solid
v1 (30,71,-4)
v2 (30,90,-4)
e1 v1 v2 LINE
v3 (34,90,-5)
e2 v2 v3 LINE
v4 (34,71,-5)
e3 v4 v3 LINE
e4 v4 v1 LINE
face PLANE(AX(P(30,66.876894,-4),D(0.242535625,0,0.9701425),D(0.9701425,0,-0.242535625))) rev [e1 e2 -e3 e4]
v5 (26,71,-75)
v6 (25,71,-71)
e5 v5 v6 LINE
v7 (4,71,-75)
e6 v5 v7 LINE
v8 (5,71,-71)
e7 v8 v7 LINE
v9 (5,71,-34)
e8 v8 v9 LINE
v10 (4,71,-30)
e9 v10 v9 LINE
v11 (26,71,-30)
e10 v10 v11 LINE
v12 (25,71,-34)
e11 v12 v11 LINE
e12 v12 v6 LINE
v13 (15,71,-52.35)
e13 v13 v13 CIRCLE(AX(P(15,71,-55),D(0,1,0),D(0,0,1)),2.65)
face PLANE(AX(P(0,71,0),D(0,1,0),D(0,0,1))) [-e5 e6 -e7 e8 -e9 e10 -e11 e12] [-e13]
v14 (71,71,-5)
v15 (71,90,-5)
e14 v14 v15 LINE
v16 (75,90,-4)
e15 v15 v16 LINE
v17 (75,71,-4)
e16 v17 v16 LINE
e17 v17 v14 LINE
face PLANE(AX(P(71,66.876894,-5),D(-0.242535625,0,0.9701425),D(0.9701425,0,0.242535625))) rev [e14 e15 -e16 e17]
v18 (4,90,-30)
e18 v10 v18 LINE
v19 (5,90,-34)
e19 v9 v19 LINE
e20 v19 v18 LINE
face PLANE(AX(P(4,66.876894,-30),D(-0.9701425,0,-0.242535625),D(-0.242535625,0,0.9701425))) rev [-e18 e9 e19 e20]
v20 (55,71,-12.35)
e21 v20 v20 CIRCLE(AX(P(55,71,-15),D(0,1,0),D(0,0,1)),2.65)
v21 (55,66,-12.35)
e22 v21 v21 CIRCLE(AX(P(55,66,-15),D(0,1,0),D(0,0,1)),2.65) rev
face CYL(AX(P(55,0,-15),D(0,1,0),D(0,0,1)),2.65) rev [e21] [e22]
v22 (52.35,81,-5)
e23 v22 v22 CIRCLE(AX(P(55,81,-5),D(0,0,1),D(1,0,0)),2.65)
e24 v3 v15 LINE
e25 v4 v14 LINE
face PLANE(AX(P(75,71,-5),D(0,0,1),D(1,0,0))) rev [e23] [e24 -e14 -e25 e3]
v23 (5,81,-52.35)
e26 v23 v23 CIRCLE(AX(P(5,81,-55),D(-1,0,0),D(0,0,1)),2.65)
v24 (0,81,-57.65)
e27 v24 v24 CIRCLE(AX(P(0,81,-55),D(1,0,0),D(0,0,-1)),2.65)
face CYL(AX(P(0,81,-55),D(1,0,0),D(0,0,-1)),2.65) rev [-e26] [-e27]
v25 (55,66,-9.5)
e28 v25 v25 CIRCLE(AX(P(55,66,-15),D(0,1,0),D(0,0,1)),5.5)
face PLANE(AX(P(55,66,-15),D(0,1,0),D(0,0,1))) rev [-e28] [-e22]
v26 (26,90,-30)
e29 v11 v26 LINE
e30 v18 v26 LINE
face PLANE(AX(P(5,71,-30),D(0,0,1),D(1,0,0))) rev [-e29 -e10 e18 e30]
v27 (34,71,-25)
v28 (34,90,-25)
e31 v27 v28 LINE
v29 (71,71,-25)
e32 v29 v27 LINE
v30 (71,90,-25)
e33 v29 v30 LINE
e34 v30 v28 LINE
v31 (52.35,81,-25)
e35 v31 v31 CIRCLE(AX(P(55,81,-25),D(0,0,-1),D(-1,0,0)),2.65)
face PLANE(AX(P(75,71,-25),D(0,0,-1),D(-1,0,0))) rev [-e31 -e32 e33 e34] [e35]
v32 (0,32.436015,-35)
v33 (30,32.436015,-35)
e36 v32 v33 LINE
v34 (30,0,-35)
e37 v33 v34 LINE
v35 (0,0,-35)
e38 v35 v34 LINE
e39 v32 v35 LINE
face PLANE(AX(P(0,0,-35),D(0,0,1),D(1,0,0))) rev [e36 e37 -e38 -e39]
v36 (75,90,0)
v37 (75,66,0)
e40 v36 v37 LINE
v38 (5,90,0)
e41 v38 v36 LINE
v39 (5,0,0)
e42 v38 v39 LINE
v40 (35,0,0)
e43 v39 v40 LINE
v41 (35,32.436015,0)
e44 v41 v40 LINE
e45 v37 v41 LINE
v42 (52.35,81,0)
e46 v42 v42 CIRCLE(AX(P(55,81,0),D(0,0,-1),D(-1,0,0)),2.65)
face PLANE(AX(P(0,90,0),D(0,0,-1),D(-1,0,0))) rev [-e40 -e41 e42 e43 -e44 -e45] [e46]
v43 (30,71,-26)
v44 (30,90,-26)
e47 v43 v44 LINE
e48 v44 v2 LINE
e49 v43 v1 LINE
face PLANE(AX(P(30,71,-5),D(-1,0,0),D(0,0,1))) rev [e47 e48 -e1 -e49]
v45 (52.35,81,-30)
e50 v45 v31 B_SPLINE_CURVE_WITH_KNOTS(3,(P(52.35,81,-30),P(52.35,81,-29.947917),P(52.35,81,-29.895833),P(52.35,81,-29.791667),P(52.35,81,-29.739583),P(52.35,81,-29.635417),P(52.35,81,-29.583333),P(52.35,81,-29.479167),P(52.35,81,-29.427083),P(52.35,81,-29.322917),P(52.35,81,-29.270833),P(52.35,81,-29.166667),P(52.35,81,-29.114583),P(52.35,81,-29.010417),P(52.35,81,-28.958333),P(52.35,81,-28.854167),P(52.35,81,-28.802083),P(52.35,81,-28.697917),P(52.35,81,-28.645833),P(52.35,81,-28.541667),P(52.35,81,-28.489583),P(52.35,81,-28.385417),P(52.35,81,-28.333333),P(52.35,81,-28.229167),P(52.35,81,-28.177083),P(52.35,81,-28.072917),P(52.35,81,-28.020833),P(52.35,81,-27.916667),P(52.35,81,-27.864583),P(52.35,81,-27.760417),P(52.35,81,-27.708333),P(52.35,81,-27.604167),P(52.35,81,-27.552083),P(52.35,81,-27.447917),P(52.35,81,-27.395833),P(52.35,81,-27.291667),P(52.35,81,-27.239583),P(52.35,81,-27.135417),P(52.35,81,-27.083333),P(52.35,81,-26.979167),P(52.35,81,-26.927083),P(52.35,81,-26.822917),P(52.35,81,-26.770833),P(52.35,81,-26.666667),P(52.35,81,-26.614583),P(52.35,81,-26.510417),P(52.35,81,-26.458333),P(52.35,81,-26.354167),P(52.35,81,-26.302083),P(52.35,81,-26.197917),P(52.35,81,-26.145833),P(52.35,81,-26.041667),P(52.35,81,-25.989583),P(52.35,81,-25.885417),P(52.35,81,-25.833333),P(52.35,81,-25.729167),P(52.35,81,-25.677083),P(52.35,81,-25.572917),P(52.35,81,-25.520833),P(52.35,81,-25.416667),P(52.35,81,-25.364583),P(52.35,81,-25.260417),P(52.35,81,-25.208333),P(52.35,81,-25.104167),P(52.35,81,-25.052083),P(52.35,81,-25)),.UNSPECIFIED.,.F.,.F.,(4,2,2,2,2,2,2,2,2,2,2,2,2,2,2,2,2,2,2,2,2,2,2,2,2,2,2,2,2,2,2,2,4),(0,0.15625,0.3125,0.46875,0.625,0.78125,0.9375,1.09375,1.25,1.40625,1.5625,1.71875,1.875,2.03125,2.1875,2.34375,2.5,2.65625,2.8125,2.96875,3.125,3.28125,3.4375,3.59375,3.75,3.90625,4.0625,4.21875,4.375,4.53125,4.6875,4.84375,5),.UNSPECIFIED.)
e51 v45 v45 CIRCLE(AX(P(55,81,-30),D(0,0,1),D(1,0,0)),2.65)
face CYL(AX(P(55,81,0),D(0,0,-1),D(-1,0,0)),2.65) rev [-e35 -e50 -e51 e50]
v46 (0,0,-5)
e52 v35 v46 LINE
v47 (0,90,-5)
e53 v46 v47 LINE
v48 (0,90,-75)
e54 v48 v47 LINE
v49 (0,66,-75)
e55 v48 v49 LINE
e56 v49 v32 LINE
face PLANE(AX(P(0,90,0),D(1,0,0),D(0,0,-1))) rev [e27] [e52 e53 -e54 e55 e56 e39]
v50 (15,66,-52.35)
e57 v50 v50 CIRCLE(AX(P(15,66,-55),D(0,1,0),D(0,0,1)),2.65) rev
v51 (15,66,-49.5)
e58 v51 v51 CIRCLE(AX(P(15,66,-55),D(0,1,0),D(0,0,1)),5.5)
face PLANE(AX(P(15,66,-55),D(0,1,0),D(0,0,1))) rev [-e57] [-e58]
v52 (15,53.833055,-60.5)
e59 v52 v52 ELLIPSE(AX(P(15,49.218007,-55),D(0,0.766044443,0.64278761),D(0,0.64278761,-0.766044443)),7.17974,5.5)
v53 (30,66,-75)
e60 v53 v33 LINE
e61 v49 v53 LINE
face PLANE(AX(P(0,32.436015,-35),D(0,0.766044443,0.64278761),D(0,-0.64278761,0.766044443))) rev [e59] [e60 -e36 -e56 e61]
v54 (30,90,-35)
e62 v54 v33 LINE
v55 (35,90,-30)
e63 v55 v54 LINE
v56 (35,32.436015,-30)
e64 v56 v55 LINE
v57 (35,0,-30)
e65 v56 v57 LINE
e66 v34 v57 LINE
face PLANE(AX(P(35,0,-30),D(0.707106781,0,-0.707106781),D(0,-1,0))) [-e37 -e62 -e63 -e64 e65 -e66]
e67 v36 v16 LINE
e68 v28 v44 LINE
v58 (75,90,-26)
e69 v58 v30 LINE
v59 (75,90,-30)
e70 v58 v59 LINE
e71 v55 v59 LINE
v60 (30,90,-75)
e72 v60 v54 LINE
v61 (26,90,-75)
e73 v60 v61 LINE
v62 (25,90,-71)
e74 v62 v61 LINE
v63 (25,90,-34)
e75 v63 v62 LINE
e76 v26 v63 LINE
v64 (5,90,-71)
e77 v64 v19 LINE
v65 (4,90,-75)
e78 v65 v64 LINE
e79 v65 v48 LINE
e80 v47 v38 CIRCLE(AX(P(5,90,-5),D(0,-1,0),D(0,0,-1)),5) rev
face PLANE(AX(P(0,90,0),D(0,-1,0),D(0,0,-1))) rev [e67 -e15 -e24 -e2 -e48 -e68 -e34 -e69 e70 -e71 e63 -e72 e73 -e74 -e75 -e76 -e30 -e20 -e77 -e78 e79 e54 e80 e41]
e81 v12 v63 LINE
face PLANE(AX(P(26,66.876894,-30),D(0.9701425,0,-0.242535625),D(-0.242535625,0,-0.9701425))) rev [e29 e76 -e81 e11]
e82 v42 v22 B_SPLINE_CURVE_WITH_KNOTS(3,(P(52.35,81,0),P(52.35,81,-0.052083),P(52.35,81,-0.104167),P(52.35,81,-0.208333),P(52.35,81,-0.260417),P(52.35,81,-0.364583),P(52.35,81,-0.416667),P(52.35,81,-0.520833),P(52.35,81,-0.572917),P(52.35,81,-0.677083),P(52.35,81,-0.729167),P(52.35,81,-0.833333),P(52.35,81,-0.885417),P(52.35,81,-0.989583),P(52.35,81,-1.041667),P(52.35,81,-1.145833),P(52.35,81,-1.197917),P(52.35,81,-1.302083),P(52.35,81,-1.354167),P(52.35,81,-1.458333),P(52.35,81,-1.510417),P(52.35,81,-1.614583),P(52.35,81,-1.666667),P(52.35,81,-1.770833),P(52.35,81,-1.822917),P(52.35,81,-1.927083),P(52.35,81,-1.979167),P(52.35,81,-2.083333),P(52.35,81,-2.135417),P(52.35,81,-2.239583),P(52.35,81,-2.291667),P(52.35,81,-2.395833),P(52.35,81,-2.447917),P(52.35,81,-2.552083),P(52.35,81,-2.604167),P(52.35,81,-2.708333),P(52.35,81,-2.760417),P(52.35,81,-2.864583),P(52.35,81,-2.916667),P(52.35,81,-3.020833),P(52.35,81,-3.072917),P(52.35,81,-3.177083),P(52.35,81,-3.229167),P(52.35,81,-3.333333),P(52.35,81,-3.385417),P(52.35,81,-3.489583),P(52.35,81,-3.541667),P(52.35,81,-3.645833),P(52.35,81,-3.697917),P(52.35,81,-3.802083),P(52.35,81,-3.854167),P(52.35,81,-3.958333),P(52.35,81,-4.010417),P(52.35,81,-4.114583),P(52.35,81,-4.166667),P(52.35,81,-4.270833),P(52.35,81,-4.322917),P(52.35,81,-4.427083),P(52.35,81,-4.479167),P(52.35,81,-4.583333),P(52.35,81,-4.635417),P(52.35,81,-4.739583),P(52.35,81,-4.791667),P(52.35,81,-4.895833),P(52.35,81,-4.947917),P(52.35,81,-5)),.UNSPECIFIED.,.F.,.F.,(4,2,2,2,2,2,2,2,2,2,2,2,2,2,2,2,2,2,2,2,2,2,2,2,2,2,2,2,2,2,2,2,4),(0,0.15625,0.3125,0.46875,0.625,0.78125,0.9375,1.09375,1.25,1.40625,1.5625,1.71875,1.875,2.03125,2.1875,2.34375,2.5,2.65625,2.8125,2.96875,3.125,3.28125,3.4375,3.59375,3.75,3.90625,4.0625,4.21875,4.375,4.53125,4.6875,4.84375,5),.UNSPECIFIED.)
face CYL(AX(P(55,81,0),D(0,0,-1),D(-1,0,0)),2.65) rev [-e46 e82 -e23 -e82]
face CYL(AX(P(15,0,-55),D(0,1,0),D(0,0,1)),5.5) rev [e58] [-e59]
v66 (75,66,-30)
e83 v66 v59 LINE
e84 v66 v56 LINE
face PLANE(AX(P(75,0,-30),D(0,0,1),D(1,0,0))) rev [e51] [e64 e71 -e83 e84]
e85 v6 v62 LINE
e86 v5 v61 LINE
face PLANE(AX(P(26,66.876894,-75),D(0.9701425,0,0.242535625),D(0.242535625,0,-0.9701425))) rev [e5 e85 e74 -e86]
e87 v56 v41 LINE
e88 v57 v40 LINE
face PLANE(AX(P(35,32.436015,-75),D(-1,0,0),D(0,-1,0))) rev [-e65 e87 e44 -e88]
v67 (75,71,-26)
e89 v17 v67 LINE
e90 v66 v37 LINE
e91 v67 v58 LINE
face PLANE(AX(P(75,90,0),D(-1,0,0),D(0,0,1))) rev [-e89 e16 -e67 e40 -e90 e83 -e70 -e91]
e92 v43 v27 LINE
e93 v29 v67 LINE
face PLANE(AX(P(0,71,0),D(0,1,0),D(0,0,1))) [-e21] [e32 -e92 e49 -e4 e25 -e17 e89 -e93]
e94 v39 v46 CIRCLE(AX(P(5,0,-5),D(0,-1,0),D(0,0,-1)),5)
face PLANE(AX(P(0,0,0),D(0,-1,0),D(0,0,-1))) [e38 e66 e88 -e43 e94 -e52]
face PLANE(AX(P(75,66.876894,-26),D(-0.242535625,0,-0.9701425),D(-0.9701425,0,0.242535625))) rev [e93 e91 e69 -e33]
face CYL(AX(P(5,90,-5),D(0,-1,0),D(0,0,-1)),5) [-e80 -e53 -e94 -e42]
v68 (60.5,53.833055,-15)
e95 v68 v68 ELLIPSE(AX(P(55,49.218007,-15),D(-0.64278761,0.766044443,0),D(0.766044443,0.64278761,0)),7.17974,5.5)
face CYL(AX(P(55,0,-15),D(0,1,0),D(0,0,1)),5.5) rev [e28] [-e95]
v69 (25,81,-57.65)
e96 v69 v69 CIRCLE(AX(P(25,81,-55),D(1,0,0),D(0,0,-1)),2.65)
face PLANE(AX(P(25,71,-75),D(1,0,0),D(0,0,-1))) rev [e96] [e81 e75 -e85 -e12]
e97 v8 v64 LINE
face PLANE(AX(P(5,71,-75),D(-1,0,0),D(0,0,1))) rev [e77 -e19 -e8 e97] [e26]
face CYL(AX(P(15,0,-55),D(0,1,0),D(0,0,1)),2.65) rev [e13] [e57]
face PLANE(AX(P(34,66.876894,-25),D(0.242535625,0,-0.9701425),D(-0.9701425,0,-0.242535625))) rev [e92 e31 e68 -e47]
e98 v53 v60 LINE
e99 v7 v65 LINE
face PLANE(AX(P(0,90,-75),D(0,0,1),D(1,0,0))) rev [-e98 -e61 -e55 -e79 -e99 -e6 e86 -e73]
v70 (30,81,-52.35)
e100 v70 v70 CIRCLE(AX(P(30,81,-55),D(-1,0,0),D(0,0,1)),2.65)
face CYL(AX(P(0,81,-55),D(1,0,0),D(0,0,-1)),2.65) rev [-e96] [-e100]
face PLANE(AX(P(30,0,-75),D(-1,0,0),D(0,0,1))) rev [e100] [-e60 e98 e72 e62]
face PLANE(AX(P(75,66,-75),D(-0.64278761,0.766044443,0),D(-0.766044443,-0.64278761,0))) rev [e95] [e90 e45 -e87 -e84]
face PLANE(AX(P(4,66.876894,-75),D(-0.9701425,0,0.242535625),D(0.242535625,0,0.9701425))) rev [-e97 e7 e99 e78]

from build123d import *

# Parameters (mm, degrees)
SKETCH1_W                = 75
SKETCH1_H                = 75
BOSS_EXTRUDE1_DEPTH      = 90
SKETCH2_W                = 45
SKETCH2_H                = 20
SKETCH2_W_2              = 20
SKETCH2_H_2              = 45
CUT_EXTRUDE2_DEPTH       = 19
SKETCH3_W                = 45
SKETCH3_H                = 45
CUT_EXTRUDE3_DEPTH       = 140.104277432
CUT_EXTRUDE4_DEPTH       = 140.104277432
CUT_EXTRUDE5_DEPTH       = 126.49900398
FILLET1_R                = 5
CUT_EXTRUDE10_DEPTH      = 126.49900398
CUT_EXTRUDE10_DEPTH_BACK = 126.49900398
SKETCH7_R                = 2.65
CUT_EXTRUDE11_DEPTH      = 126.49900398
CUT_EXTRUDE11_DEPTH_BACK = 126.49900398
SKETCH8_R                = 2.65
SKETCH9_R                = 2.65
CUT_EXTRUDE12_DEPTH      = 128.636201761
SKETCH10_R               = 5.5
CUT_EXTRUDE13_DEPTH      = 125.923976882
CHAMFER3_SIZE            = 5
CUT_EXTRUDE14_DEPTH      = 19


with BuildPart() as part:
    # Sketch1 → Boss-Extrude1 (new body)
    with BuildSketch(Plane(origin=(0, 0, 0), x_dir=(1, 0, 0), z_dir=(0, 1, 0))):
        with Locations((37.5, 37.5)):
            Rectangle(SKETCH1_W, SKETCH1_H)
    extrude(amount=BOSS_EXTRUDE1_DEPTH)

    # Sketch2 → Cut-Extrude2 (cut)
    with BuildSketch(Plane(origin=(0, 90, 0), x_dir=(1, 0, 0), z_dir=(0, 1, 0))):
        with Locations((52.5, 15)):
            Rectangle(SKETCH2_W, SKETCH2_H)
        with Locations((15, 52.5)):
            Rectangle(SKETCH2_W_2, SKETCH2_H_2)
    extrude(amount=-CUT_EXTRUDE2_DEPTH, mode=Mode.SUBTRACT)

    # Sketch3 → Cut-Extrude3 (cut, through all)
    with BuildSketch(Plane(origin=(0, 90, 0), x_dir=(1, 0, 0), z_dir=(0, 1, 0))):
        with Locations((52.5, 52.5)):
            Rectangle(SKETCH3_W, SKETCH3_H)
    extrude(amount=-CUT_EXTRUDE3_DEPTH, mode=Mode.SUBTRACT)

    # Sketch4 → Cut-Extrude4 (cut, through all)
    with BuildSketch(Plane.XY):
        Polygon((35, 32.436014753), (35, 0), (75, 0), (75, 66), align=None)
    extrude(amount=-CUT_EXTRUDE4_DEPTH, mode=Mode.SUBTRACT)

    # Sketch5 → Cut-Extrude5 (cut, through all)
    with BuildSketch(Plane(origin=(30, 0, 0), x_dir=(0, 0, -1), z_dir=(1, 0, 0))):
        Polygon((35, 0), (35, 32.436014753), (75, 66), (75, 0), align=None)
    extrude(amount=-CUT_EXTRUDE5_DEPTH, mode=Mode.SUBTRACT)

    # Fillet1
    fillet1_edges = [part.edges().sort_by_distance(p)[0] for p in [
        (0, 45, 0),
    ]]
    fillet(fillet1_edges, radius=FILLET1_R)

    # Sketch7 → Cut-Extrude10 (cut, two sides: drawn at the far end of the back side and taken through both)
    with BuildSketch(Plane(origin=(0, 0, -30), x_dir=(-1, 0, 0), z_dir=(0, 0, -1)).offset(-CUT_EXTRUDE10_DEPTH_BACK)):
        with Locations((-55, 81)):
            Circle(SKETCH7_R)
    extrude(amount=CUT_EXTRUDE10_DEPTH + CUT_EXTRUDE10_DEPTH_BACK, mode=Mode.SUBTRACT)

    # Sketch8 → Cut-Extrude11 (cut, two sides: drawn at the far end of the back side and taken through both)
    with BuildSketch(Plane(origin=(30, 0, 0), x_dir=(0, 0, -1), z_dir=(1, 0, 0)).offset(-CUT_EXTRUDE11_DEPTH_BACK)):
        with Locations((55, 81)):
            Circle(SKETCH8_R)
    extrude(amount=CUT_EXTRUDE11_DEPTH + CUT_EXTRUDE11_DEPTH_BACK, mode=Mode.SUBTRACT)

    # Sketch9 → Cut-Extrude12 (cut, through all)
    with BuildSketch(Plane(origin=(0, 71, 0), x_dir=(1, 0, 0), z_dir=(0, 1, 0))):
        with Locations(Location((15, 55, 0), (0, 0, 270))):
            Circle(SKETCH9_R)
        with Locations(Location((55, 15, 0), (0, 0, 270))):
            Circle(SKETCH9_R)
    extrude(amount=-CUT_EXTRUDE12_DEPTH, mode=Mode.SUBTRACT)

    # Sketch10 → Cut-Extrude13 (cut, through all)
    with BuildSketch(Plane(origin=(0, 66, 0), x_dir=(1, 0, 0), z_dir=(0, 1, 0))):
        with Locations(Location((55, 15, 0), (0, 0, 270))):
            Circle(SKETCH10_R)
        with Locations(Location((15, 55, 0), (0, 0, 270))):
            Circle(SKETCH10_R)
    extrude(amount=-CUT_EXTRUDE13_DEPTH, mode=Mode.SUBTRACT)

    # Chamfer3
    chamfer3_edges = [part.edges().sort_by_distance(p)[0] for p in [
        (30, 45, -30),
    ]]
    chamfer(chamfer3_edges, length=CHAMFER3_SIZE - 0.0001)  # a hair under: the kernel refuses the full size

    # Sketch11 → Cut-Extrude14 (cut)
    with BuildSketch(Plane(origin=(0, 90, 0), x_dir=(1, 0, 0), z_dir=(0, 1, 0))):
        Polygon((5, 30), (4, 30), (5, 34), align=None)
        Polygon((25, 30), (26, 30), (25, 34), align=None)
        Polygon((30, 25), (34, 25), (30, 26), align=None)
        Polygon((30, 5), (30, 4), (34, 5), align=None)
        Polygon((25, 75), (26, 75), (25, 71), align=None)
        Polygon((5, 71), (5, 75), (4, 75), align=None)
        Polygon((75, 5), (71, 5), (75, 4), align=None)
        Polygon((71, 25), (75, 25), (75, 26), align=None)
    extrude(amount=-CUT_EXTRUDE14_DEPTH, mode=Mode.SUBTRACT)


solid = part.part
